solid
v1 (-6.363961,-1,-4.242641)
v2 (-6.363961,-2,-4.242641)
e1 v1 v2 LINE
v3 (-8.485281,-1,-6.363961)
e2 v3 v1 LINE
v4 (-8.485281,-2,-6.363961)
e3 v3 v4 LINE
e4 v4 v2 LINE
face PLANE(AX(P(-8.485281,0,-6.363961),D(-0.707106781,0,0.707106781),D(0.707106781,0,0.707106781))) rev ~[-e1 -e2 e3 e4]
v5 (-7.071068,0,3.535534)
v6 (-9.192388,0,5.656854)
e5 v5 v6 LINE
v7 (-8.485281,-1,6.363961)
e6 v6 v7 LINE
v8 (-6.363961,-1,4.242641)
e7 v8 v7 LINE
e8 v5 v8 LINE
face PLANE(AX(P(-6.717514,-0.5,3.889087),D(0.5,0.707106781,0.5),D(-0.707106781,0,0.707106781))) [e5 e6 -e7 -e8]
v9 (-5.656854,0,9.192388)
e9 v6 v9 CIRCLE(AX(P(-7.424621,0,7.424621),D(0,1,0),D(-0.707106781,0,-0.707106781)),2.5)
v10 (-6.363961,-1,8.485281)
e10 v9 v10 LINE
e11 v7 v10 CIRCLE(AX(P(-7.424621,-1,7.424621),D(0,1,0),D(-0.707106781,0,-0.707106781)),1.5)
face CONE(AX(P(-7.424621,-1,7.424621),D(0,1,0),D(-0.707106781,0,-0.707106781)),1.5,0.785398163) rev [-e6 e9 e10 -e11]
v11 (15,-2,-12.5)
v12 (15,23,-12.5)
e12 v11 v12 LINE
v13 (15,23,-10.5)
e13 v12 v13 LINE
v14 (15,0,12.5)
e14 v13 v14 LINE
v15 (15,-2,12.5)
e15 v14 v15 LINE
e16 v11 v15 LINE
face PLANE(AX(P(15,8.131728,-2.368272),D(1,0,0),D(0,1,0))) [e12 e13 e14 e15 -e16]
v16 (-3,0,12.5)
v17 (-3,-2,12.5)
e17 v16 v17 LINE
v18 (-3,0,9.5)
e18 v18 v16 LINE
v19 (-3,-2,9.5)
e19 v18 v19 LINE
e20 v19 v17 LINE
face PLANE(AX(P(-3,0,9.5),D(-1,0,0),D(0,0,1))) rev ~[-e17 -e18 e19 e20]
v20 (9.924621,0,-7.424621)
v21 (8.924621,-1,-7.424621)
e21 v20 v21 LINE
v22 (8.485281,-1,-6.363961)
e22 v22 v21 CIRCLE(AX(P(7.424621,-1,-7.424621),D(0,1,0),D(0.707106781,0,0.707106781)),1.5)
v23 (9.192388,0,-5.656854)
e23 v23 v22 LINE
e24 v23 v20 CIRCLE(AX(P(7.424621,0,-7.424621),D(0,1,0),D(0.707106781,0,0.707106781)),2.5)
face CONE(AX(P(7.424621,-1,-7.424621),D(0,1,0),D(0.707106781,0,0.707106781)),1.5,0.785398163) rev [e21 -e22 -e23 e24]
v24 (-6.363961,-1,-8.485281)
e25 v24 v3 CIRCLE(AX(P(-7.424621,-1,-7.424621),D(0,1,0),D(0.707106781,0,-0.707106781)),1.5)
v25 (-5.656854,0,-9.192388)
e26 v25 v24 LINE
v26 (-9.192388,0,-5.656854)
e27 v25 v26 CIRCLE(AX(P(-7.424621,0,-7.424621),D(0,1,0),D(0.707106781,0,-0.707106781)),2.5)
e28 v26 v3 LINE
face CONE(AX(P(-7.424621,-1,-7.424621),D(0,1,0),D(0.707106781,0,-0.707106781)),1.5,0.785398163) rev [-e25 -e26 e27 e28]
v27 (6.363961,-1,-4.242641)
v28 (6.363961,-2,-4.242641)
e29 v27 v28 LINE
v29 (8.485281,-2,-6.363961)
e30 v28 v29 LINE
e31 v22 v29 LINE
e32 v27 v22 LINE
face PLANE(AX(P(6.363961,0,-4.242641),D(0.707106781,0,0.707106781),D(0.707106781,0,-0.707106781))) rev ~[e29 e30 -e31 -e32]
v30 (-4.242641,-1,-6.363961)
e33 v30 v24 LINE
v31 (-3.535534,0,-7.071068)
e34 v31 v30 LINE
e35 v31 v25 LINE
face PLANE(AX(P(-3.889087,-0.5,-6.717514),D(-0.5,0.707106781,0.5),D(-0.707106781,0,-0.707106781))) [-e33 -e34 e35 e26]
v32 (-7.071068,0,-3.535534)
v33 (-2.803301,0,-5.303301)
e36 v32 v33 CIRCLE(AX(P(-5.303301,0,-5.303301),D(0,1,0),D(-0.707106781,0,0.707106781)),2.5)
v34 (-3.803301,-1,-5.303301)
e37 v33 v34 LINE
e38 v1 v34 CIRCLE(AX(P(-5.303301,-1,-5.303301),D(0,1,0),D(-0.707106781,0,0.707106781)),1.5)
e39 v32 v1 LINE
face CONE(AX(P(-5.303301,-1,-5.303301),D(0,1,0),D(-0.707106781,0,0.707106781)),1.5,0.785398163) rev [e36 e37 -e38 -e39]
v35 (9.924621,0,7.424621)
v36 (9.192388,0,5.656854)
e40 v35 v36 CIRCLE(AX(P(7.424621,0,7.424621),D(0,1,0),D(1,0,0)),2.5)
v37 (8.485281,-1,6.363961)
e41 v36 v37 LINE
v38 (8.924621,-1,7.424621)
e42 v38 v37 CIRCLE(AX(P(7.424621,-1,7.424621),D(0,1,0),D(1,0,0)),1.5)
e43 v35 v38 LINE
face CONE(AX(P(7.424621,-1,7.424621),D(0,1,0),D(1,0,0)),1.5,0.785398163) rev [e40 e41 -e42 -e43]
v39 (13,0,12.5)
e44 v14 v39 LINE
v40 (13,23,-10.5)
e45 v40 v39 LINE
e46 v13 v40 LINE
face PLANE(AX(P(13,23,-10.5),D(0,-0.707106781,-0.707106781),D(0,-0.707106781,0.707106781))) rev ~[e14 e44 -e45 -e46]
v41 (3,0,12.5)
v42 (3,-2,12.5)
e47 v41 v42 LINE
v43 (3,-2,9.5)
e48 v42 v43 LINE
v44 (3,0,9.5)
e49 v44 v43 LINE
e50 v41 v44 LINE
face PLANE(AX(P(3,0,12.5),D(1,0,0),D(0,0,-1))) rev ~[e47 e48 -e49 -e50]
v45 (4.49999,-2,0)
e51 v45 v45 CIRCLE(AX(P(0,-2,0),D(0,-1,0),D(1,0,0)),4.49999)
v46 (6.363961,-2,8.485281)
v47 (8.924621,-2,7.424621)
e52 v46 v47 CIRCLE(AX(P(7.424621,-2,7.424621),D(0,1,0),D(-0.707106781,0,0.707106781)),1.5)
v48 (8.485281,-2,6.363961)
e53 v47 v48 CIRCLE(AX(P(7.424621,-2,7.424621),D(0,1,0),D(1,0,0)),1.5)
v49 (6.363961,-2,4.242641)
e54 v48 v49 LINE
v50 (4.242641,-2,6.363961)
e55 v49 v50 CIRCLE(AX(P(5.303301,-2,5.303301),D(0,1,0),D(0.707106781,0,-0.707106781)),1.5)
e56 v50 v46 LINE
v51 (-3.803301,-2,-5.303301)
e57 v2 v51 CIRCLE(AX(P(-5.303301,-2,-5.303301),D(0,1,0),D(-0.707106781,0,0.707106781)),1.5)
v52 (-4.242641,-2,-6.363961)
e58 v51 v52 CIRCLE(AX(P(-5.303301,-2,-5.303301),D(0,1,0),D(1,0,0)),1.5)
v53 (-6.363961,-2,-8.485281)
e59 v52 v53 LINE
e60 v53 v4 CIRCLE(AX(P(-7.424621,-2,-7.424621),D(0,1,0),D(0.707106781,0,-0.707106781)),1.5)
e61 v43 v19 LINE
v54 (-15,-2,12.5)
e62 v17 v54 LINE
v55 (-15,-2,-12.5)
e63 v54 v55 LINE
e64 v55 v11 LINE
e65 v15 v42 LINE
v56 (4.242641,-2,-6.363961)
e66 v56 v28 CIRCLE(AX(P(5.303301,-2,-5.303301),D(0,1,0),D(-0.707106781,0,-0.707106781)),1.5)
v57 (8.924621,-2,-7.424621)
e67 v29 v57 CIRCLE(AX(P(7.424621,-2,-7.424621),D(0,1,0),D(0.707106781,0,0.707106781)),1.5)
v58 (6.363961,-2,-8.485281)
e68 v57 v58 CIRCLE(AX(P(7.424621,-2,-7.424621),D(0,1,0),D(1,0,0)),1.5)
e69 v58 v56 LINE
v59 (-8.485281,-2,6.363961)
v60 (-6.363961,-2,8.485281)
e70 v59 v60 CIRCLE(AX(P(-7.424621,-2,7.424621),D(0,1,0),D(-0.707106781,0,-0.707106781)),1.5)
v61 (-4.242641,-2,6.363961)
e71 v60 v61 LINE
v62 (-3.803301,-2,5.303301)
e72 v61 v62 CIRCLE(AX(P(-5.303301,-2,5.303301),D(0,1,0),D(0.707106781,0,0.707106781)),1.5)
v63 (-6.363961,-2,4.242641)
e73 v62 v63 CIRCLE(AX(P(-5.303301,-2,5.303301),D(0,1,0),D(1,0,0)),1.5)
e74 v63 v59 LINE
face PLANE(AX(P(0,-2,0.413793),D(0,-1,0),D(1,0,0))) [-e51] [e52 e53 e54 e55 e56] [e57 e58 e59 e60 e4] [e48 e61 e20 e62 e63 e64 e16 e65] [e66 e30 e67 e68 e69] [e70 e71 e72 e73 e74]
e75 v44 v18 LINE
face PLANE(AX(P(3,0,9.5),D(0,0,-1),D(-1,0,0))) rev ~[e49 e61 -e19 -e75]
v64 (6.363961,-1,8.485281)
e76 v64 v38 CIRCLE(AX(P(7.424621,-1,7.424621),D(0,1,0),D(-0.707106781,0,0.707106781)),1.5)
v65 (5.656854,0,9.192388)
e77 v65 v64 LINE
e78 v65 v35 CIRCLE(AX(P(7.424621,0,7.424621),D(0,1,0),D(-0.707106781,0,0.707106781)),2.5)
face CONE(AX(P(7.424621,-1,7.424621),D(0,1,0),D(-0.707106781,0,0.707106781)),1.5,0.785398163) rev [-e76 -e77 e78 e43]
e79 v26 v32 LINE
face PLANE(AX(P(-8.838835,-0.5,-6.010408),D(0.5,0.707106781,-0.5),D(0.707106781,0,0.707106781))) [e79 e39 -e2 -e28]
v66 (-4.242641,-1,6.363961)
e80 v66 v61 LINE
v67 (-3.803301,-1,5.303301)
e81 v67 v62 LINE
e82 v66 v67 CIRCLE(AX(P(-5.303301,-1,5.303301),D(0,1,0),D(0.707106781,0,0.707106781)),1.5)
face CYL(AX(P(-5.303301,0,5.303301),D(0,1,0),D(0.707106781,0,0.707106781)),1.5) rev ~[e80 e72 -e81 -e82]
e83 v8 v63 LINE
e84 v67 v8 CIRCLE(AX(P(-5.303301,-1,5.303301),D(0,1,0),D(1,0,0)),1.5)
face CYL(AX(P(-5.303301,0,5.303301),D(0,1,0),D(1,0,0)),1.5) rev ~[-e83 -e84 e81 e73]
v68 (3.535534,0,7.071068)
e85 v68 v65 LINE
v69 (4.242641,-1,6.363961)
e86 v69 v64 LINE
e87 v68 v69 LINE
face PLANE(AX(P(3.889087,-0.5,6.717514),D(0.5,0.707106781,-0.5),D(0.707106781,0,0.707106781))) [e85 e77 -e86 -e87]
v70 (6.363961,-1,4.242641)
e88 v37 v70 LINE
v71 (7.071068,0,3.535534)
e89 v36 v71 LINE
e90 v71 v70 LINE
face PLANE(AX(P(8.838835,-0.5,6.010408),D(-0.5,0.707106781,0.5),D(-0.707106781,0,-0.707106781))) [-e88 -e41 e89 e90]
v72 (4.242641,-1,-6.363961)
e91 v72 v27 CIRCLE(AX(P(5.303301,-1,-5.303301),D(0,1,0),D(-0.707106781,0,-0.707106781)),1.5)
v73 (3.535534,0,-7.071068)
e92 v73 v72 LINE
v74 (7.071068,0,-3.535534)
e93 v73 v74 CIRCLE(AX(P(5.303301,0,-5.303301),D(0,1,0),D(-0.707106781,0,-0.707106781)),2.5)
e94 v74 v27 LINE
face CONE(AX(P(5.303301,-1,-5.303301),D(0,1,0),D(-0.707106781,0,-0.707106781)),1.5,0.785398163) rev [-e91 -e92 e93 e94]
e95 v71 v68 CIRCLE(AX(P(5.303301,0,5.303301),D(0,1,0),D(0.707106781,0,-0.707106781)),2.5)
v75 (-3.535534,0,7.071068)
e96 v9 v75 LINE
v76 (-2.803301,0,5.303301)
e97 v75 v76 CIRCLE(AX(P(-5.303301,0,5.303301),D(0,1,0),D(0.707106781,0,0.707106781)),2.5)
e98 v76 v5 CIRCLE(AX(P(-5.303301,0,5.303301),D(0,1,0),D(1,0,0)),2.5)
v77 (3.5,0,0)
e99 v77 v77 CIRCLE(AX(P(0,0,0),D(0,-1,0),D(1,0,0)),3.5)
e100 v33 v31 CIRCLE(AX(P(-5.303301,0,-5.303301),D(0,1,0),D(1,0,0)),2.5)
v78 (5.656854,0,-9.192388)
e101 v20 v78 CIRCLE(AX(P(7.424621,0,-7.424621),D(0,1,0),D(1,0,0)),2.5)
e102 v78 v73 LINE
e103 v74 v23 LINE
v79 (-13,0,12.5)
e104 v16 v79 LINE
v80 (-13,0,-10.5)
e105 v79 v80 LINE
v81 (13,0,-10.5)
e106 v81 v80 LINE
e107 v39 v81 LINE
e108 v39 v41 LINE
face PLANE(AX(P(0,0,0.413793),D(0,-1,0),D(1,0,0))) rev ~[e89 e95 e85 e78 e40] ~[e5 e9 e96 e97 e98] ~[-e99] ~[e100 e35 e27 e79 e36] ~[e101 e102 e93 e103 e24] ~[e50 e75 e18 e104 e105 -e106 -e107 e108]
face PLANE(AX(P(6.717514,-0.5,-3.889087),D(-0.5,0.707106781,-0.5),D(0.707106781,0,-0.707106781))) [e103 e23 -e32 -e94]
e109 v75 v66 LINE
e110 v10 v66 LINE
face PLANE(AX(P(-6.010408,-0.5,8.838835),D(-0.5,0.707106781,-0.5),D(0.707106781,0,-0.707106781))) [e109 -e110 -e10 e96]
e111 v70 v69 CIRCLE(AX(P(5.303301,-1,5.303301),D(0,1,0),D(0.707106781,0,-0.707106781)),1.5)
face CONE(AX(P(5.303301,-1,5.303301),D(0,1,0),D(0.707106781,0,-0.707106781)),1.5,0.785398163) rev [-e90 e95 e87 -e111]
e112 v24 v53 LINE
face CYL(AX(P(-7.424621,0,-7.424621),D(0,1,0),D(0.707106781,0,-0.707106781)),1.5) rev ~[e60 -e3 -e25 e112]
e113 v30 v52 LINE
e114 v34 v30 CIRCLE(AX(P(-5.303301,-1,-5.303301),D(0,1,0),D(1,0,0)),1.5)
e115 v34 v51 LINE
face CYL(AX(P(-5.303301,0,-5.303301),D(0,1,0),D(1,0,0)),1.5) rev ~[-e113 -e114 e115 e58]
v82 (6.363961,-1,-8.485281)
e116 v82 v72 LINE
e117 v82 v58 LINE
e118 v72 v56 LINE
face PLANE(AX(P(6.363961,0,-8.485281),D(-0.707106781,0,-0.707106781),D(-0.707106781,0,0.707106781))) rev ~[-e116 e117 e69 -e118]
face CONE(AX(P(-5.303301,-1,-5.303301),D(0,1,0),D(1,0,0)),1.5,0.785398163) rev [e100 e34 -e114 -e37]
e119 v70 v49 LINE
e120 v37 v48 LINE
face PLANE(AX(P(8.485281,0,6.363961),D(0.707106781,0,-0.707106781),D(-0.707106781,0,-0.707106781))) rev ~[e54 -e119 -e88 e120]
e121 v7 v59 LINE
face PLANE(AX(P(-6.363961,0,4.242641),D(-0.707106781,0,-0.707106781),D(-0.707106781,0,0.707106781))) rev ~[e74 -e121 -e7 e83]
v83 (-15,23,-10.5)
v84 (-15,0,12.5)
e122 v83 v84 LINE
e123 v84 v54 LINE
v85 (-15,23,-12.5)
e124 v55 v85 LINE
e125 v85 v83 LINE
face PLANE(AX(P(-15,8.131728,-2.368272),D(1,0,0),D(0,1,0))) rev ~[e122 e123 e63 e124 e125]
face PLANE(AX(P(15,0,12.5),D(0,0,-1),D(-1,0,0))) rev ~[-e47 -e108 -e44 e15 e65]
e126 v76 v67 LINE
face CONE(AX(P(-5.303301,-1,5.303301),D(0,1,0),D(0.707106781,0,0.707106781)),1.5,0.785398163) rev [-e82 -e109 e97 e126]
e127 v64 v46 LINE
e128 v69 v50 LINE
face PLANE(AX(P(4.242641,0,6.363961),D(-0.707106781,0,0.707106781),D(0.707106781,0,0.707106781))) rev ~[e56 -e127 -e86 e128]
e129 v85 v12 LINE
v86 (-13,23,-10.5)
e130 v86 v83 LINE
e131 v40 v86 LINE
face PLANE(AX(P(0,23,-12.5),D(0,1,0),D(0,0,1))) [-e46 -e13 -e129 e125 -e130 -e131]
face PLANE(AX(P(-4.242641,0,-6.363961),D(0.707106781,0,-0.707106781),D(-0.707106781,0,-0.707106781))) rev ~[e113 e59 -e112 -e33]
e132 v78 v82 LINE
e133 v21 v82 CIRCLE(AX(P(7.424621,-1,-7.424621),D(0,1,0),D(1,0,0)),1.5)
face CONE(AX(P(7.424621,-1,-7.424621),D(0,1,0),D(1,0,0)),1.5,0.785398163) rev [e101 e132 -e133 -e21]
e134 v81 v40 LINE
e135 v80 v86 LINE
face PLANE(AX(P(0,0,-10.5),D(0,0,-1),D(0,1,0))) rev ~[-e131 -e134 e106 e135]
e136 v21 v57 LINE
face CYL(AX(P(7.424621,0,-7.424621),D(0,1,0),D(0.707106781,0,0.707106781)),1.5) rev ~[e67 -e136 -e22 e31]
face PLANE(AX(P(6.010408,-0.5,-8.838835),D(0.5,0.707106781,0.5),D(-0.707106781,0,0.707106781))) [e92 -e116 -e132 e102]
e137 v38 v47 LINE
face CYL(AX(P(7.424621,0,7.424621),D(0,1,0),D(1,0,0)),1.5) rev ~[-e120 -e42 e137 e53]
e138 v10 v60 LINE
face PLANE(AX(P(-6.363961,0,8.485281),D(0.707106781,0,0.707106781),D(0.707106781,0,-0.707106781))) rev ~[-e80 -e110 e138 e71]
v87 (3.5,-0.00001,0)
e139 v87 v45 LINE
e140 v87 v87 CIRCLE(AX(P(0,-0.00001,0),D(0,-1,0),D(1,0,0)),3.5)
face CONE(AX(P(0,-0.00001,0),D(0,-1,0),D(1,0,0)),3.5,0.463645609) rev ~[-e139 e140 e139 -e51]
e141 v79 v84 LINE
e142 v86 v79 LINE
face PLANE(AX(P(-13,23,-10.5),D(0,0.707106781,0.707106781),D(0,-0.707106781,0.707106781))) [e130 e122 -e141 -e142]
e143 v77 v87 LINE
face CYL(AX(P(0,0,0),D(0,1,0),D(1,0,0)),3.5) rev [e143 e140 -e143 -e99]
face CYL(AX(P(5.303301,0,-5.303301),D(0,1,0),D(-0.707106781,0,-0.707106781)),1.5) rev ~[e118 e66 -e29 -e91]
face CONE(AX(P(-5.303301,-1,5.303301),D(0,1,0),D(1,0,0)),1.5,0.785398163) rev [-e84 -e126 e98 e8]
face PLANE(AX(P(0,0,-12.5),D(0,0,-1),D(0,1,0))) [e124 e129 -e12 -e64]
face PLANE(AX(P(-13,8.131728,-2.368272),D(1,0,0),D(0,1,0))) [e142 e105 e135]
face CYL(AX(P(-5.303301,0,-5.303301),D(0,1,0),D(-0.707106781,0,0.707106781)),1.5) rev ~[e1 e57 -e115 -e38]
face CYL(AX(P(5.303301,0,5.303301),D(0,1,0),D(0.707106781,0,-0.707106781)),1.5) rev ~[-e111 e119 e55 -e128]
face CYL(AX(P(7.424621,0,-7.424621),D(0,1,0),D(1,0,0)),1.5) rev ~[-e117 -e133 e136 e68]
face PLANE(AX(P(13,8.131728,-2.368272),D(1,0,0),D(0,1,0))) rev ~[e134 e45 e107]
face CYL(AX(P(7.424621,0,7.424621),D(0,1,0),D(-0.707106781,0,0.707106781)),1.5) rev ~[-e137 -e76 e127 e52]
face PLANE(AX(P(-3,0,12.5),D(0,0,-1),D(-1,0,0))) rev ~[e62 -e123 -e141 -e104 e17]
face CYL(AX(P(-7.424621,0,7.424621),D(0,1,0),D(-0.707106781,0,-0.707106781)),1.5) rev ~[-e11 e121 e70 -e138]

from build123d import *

# Parameters (mm, degrees)
F0_R     = 3.5
F1_DEPTH = 2
F2_W     = 23
F2_H     = 2
F3_DEPTH = 15
F4_START = 13
F4_DEPTH = 2
F5_START = -13
F5_DEPTH = 2
F6_SIZE  = 1
F7_SIZE2 = 0.99999
F7_SIZE  = 1.99999


# Not quite as in the source:
# - a fillet or chamfer is up to 0.001 mm smaller than in the source, because OpenCascade refuses the exact size


with BuildPart() as f1:
    # F0 (on Front) → F1 (new body)
    with BuildSketch(Plane.XZ):
        Polygon((-3, 12.5), (-15, 12.5), (-15, -12.5), (15, -12.5), (15, 12.5), (3, 12.5), (3, 9.5), (-3, 9.5), align=None)
        with BuildLine():
            ThreePointArc((-6.3639610307, -8.4852813742), (-8.4852813742, -8.4852813742), (-8.4852813742, -6.3639610307))
            Line((-8.4852813742, -6.3639610307), (-6.3639610307, -4.2426406871))
            ThreePointArc((-6.3639610307, -4.2426406871), (-4.7292757104, -3.9174815601), (-3.8033008589, -5.3033008589))
            ThreePointArc((-3.8033008589, -5.3033008589), (-3.9174815601, -5.8773260074), (-4.2426406871, -6.3639610307))
            Line((-4.2426406871, -6.3639610307), (-6.3639610307, -8.4852813742))
        make_face(mode=Mode.SUBTRACT)
        with BuildLine():
            ThreePointArc((8.4852813742, -6.3639610307), (8.8104405012, -6.8505960539), (8.9246212025, -7.4246212025))
            ThreePointArc((8.9246212025, -7.4246212025), (7.998646351, -8.8104405012), (6.3639610307, -8.4852813742))
            Line((6.3639610307, -8.4852813742), (4.2426406871, -6.3639610307))
            ThreePointArc((4.2426406871, -6.3639610307), (4.2426406871, -4.2426406871), (6.3639610307, -4.2426406871))
            Line((6.3639610307, -4.2426406871), (8.4852813742, -6.3639610307))
        make_face(mode=Mode.SUBTRACT)
        with BuildLine():
            ThreePointArc((-8.4852813742, 6.3639610307), (-8.4852813742, 8.4852813742), (-6.3639610307, 8.4852813742))
            Line((-6.3639610307, 8.4852813742), (-4.2426406871, 6.3639610307))
            ThreePointArc((-4.2426406871, 6.3639610307), (-3.9174815601, 5.8773260074), (-3.8033008589, 5.3033008589))
            ThreePointArc((-3.8033008589, 5.3033008589), (-4.7292757104, 3.9174815601), (-6.3639610307, 4.2426406871))
            Line((-6.3639610307, 4.2426406871), (-8.4852813742, 6.3639610307))
        make_face(mode=Mode.SUBTRACT)
        Circle(F0_R, mode=Mode.SUBTRACT)
        with BuildLine():
            ThreePointArc((6.3639610307, 8.4852813742), (7.998646351, 8.8104405012), (8.9246212025, 7.4246212025))
            ThreePointArc((8.9246212025, 7.4246212025), (8.8104405012, 6.8505960539), (8.4852813742, 6.3639610307))
            Line((8.4852813742, 6.3639610307), (6.3639610307, 4.2426406871))
            ThreePointArc((6.3639610307, 4.2426406871), (4.2426406871, 4.2426406871), (4.2426406871, 6.3639610307))
            Line((4.2426406871, 6.3639610307), (6.3639610307, 8.4852813742))
        make_face(mode=Mode.SUBTRACT)
    extrude(amount=F1_DEPTH)

    # F2 (on Right) → F3 (join, symmetric)
    with BuildSketch(Plane.YZ):
        with Locations((11.5, -11.5)):
            Rectangle(F2_W, F2_H)
    extrude(amount=F3_DEPTH, both=True)

    # F2 (on Right) → F4 (join)
    with BuildSketch(Plane.YZ.offset(F4_START)):
        Polygon((0, 12.5), (0, -10.5), (23, -10.5), align=None)
    extrude(amount=F4_DEPTH)

    # F2 (on Right) → F5 (join)
    with BuildSketch(Plane.YZ.offset(F5_START)):
        Polygon((0, 12.5), (0, -10.5), (23, -10.5), align=None)
    extrude(amount=-F5_DEPTH)

    # F6
    f6_edges = [f1.edges().sort_by_distance(p)[0] for p in [
        (5.303301, 0, 7.424621),
        (-5.303301, 0, 7.424621),
        (-7.424621, 0, -5.303301),
        (7.424621, 0, -5.303301),
    ]]
    chamfer(f6_edges, length=F6_SIZE)

    # F7 (size 2 and 1 in the source; OpenCascade refuses exactly that, so slightly less here)
    f7_edges = [f1.edges().sort_by_distance(p)[0] for p in [
        (-3.5, -2, 0),
    ]]
    f7_side = f1.faces().sort_by_distance((-3.5, -1, 0))[0]
    chamfer(f7_edges, length=F7_SIZE, length2=F7_SIZE2, reference=f7_side)


solid = f1.part
